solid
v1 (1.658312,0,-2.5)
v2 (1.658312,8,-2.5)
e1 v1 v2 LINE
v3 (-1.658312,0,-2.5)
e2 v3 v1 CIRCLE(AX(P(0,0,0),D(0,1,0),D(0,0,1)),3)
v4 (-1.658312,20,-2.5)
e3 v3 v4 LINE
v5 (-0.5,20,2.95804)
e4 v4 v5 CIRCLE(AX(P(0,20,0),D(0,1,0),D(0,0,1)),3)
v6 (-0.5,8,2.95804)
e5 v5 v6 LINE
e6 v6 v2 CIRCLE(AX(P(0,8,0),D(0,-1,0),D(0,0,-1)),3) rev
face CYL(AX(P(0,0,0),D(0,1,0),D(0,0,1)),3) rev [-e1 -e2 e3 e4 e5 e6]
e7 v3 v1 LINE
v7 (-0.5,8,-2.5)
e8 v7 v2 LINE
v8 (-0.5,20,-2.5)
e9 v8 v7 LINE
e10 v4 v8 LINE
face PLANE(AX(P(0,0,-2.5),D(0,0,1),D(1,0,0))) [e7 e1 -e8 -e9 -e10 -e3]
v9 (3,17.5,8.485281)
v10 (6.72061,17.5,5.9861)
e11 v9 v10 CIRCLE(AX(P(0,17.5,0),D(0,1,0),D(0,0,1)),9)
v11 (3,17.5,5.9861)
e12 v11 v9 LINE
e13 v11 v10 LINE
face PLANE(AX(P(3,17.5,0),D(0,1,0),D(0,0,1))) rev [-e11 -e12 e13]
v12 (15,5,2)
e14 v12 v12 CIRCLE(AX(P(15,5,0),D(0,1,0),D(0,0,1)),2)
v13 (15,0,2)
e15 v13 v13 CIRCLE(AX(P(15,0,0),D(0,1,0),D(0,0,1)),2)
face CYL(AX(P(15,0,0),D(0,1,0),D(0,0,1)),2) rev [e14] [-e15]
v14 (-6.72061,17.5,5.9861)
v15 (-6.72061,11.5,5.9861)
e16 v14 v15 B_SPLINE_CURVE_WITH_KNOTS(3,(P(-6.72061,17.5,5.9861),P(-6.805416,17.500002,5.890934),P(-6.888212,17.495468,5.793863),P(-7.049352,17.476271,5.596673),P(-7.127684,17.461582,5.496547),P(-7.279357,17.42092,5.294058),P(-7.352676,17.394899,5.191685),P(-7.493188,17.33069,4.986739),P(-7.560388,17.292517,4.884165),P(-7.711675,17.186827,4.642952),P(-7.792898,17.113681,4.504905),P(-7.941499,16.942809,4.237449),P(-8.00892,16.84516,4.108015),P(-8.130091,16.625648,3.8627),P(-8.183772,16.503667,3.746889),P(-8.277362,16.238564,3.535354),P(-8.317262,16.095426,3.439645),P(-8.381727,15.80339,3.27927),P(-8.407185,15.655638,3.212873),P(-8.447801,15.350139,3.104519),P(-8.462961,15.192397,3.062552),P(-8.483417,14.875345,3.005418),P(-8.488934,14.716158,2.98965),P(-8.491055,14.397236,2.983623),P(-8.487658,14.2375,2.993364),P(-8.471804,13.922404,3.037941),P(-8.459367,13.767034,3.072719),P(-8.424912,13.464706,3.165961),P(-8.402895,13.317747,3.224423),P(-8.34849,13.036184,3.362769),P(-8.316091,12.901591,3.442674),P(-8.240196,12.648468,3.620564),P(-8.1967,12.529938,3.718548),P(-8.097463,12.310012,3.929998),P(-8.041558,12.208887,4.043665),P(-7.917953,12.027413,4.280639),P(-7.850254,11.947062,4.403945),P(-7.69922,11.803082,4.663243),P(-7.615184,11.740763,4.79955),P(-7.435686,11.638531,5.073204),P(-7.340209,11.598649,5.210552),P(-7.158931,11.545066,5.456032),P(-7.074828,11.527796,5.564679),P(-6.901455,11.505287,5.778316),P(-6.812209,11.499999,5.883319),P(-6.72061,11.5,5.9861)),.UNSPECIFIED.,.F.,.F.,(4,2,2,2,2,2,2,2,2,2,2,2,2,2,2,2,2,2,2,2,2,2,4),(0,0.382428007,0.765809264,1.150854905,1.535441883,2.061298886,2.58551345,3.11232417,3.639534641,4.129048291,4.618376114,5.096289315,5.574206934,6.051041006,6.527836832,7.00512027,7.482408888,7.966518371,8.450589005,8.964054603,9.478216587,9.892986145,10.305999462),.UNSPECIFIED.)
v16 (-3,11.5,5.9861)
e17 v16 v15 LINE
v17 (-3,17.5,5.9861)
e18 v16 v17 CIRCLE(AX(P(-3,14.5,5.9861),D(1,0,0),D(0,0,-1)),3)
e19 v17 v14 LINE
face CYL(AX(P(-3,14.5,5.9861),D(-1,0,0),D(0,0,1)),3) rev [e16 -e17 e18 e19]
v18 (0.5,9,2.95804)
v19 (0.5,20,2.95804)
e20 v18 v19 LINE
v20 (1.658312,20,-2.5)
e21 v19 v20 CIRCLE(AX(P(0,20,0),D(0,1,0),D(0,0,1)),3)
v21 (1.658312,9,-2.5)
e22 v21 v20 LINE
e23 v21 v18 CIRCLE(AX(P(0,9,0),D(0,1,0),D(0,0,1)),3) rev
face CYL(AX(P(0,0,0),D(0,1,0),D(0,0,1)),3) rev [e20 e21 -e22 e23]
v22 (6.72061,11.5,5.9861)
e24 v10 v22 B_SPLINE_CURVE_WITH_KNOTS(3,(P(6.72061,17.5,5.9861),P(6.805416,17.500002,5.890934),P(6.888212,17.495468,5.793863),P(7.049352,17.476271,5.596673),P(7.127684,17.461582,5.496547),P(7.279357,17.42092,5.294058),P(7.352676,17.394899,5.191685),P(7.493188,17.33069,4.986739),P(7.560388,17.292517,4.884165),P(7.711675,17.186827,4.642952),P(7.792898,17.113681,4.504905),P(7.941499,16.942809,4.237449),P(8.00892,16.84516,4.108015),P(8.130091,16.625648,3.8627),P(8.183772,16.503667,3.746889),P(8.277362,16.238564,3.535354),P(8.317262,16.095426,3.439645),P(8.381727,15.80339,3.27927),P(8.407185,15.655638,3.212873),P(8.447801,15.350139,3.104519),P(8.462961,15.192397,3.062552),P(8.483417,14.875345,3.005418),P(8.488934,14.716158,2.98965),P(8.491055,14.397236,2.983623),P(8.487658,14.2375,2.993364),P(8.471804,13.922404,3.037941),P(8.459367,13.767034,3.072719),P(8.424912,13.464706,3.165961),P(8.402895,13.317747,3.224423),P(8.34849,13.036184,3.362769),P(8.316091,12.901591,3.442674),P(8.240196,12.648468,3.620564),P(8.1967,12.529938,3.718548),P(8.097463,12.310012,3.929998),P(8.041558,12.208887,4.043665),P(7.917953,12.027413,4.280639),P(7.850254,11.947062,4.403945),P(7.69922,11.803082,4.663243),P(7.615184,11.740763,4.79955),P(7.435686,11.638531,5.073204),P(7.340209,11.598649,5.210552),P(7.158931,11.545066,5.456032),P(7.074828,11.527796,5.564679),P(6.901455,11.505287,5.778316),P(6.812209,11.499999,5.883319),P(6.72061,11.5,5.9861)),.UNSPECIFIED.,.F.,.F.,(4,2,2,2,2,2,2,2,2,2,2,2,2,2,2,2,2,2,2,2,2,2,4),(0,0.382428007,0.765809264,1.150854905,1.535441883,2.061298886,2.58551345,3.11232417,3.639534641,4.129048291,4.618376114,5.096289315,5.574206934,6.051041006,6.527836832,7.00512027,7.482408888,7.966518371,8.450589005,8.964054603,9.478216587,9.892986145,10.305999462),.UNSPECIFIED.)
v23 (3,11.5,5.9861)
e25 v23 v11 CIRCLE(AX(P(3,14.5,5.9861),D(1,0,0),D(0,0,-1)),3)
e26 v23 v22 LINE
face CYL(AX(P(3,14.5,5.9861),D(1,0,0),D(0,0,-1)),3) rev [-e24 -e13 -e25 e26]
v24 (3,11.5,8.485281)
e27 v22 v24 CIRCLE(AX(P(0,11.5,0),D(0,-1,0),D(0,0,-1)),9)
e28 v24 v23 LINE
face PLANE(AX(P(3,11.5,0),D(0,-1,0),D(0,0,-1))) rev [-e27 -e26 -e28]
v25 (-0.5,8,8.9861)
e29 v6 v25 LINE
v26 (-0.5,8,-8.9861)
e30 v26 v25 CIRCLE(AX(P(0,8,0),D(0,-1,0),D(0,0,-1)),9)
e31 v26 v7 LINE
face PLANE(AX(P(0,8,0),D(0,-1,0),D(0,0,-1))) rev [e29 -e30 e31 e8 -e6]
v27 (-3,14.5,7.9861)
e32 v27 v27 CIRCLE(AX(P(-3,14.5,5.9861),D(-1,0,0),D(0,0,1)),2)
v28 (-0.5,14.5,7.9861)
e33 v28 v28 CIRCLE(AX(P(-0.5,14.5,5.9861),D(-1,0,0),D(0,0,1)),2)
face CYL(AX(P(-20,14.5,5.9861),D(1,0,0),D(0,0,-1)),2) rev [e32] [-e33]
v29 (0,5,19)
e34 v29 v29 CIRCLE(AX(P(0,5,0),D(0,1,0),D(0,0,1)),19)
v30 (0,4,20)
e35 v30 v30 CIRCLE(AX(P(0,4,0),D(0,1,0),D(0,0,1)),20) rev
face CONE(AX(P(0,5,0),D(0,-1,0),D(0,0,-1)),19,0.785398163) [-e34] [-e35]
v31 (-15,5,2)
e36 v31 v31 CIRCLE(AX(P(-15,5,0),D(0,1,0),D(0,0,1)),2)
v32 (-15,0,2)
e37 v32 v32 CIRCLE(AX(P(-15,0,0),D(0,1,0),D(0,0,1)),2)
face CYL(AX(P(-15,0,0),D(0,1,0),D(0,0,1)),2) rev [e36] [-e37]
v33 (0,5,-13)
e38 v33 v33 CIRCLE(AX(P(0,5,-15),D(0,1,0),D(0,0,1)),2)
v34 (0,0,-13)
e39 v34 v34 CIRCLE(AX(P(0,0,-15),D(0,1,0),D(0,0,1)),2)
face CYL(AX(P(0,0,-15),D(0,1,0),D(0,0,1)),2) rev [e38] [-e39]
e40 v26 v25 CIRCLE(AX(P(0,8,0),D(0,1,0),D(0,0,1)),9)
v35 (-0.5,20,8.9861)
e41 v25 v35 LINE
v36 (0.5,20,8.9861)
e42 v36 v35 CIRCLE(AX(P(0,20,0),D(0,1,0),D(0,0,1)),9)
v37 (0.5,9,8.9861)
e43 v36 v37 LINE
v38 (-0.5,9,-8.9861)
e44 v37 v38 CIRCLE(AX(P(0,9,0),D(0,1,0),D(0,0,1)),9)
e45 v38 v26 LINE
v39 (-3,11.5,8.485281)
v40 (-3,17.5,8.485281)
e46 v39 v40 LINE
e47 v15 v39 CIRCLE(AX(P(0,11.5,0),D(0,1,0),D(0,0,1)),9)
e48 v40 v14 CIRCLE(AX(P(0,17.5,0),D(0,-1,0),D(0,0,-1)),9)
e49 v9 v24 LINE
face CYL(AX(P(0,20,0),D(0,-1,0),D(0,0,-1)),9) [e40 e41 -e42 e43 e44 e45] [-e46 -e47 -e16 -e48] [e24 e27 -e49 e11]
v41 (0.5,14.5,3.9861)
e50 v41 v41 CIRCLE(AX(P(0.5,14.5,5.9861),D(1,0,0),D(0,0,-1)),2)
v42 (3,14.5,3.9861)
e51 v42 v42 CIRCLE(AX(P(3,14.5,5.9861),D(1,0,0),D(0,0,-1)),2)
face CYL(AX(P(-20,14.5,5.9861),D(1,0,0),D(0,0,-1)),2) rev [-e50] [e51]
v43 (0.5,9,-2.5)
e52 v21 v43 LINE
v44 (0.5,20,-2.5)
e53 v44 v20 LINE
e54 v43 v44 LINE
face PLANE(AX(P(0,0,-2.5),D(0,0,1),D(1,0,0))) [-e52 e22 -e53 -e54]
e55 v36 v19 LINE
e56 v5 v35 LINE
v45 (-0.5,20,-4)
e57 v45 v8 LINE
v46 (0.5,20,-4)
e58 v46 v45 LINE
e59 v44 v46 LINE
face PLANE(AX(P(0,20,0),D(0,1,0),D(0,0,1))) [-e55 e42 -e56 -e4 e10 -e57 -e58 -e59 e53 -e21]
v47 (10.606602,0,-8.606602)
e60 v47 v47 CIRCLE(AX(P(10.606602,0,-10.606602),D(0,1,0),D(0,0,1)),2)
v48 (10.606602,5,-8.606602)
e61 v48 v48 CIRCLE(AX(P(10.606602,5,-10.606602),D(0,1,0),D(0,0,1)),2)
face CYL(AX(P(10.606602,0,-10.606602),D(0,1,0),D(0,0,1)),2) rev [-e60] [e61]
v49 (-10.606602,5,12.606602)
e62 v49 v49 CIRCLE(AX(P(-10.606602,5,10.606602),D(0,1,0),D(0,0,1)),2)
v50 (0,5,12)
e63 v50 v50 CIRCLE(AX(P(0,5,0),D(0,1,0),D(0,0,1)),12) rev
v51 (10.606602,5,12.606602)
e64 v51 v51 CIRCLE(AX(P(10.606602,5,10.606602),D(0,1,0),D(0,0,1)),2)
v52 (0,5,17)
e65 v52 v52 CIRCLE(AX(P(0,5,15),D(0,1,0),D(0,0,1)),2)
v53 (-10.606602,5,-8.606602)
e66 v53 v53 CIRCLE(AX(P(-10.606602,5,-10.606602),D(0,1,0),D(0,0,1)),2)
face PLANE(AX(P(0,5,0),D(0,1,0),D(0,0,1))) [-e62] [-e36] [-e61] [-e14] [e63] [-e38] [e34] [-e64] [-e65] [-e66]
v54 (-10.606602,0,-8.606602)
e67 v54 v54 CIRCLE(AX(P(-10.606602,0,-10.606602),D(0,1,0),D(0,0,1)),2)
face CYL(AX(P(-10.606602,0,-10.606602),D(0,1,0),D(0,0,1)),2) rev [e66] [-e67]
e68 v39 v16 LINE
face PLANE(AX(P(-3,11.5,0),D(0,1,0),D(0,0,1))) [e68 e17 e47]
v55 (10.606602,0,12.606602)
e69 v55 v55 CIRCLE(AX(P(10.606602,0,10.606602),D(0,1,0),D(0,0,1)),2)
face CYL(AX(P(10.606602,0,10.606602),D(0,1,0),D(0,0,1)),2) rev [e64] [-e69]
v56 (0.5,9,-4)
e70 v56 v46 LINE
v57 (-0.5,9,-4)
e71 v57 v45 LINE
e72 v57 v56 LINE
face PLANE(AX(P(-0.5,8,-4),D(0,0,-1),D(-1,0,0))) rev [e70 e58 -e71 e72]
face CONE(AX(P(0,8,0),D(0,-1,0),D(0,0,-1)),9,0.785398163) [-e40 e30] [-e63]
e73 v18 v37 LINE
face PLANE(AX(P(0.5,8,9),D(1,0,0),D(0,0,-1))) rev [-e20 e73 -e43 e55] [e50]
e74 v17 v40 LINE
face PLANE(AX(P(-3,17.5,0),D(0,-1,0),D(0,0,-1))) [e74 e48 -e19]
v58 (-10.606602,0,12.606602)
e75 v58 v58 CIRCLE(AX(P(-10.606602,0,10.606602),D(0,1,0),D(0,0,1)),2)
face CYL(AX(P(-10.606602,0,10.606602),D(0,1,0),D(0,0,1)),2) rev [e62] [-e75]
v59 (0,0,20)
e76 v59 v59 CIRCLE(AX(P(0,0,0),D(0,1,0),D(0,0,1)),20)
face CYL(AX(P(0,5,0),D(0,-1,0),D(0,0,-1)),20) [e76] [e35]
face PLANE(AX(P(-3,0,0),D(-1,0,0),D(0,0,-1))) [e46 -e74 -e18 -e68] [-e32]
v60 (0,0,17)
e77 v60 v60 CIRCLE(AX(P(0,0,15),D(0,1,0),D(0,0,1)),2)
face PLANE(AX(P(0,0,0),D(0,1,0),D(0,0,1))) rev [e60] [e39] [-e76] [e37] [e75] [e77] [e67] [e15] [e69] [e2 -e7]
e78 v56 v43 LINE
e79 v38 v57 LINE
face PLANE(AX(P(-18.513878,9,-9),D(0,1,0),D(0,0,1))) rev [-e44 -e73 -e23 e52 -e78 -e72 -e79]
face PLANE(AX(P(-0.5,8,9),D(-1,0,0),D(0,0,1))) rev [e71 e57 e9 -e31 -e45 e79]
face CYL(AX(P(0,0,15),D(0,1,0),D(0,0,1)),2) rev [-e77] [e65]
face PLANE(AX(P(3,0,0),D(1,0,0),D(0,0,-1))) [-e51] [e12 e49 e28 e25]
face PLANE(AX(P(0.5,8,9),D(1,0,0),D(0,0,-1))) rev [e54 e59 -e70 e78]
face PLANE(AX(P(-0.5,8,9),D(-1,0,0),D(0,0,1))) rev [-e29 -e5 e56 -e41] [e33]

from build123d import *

# Parameters (mm, degrees)
SKETCH1_R           = 20
BOSS_EXTRUDE1_DEPTH = 5
SKETCH2_R           = 2
CUT_EXTRUDE1_DEPTH  = 29.722813233
SKETCH3_R           = 9
BOSS_EXTRUDE2_DEPTH = 15
CUT_EXTRUDE2_DEPTH  = 35.641016151
SKETCH5_W           = 1
SKETCH5_H           = 13
CUT_EXTRUDE3_DEPTH  = 12
CUT_EXTRUDE4_REACH  = 42.509
SKETCH7_W           = 17.986100378
SKETCH7_H           = 1
SKETCH8_R           = 3
CUT_EXTRUDE5_DEPTH  = 6
SKETCH9_R           = 2
CUT_EXTRUDE6_DEPTH  = 37.455452322
CHAMFER3_SIZE       = 3
CHAMFER4_SIZE       = 1


with BuildPart() as part:
    # Sketch1 → Boss-Extrude1 (new body)
    with BuildSketch(Plane(origin=(0, 0, 0), x_dir=(1, 0, 0), z_dir=(0, 1, 0))):
        with Locations(Location((0, 0, 0), (0, 0, 270))):
            Circle(SKETCH1_R)
    extrude(amount=BOSS_EXTRUDE1_DEPTH)

    # Sketch2 → Cut-Extrude1 (cut, through all)
    with BuildSketch(Plane(origin=(0, 5, 0), x_dir=(1, 0, 0), z_dir=(0, 1, 0))):
        with Locations(Location((0, 15, 0), (0, 0, 270))):
            Circle(SKETCH2_R)
        with Locations(Location((10.606601718, 10.606601718, 0), (0, 0, 270))):
            Circle(SKETCH2_R)
        with Locations(Location((15, 0, 0), (0, 0, 270))):
            Circle(SKETCH2_R)
        with Locations(Location((10.606601718, -10.606601718, 0), (0, 0, 270))):
            Circle(SKETCH2_R)
        with Locations(Location((0, -15, 0), (0, 0, 270))):
            Circle(SKETCH2_R)
        with Locations(Location((-10.606601718, -10.606601718, 0), (0, 0, 270))):
            Circle(SKETCH2_R)
        with Locations(Location((-15, 0, 0), (0, 0, 270))):
            Circle(SKETCH2_R)
        with Locations(Location((-10.606601718, 10.606601718, 0), (0, 0, 270))):
            Circle(SKETCH2_R)
    extrude(amount=-CUT_EXTRUDE1_DEPTH, mode=Mode.SUBTRACT)

    # Sketch3 → Boss-Extrude2 (add)
    with BuildSketch(Plane(origin=(0, 5, 0), x_dir=(1, 0, 0), z_dir=(0, 1, 0))):
        with Locations(Location((0, 0, 0), (0, 0, 270))):
            Circle(SKETCH3_R)
    extrude(amount=BOSS_EXTRUDE2_DEPTH)

    # Sketch4 → Cut-Extrude2 (cut, through all)
    with BuildSketch(Plane(origin=(0, 20, 0), x_dir=(1, 0, 0), z_dir=(0, 1, 0))):
        with BuildLine():
            Line((1.658312395, 2.5), (-1.658312395, 2.5))
            ThreePointArc((-1.658312395, 2.5), (-1.418637165, -2.643382037), (3, 0))
            ThreePointArc((3, 0), (2.643382037, 1.418637165), (1.658312395, 2.5))
        make_face()
    extrude(amount=-CUT_EXTRUDE2_DEPTH, mode=Mode.SUBTRACT)

    # Sketch5 → Cut-Extrude3 (cut)
    with BuildSketch(Plane(origin=(0, 20, 0), x_dir=(1, 0, 0), z_dir=(0, 1, 0))):
        with Locations((0, -2.5)):
            Rectangle(SKETCH5_W, SKETCH5_H)
    extrude(amount=-CUT_EXTRUDE3_DEPTH, mode=Mode.SUBTRACT)

    # Cut-Extrude4: up to this face of the body (flat: up to its plane)
    cut_extrude4_end = Plane(part.part.faces().sort_by_distance((-0.5, 14, 5.972070135))[0])
    # Sketch7 → Cut-Extrude4 (cut, up to the picked face)
    with BuildSketch(Plane(origin=(9, 0, 0), x_dir=(0, 0, -1), z_dir=(1, 0, 0)), mode=Mode.PRIVATE) as cut_extrude4_sk1:
        with Locations((0.006949811, 8.5)):
            Rectangle(SKETCH7_W, SKETCH7_H)
    cut_extrude4_tool1 = split(extrude(cut_extrude4_sk1.sketch, amount=-CUT_EXTRUDE4_REACH, mode=Mode.PRIVATE), bisect_by=cut_extrude4_end, keep=Keep.BOTH, mode=Mode.PRIVATE)
    add(cut_extrude4_tool1.solids().sort_by(Axis((9, 8.5, -0.00695), (-1, 0, 0)))[0], mode=Mode.SUBTRACT)

    # Sketch8 → Cut-Extrude5 (cut)
    with BuildSketch(Plane(origin=(9, 0, 0), x_dir=(0, 0, -1), z_dir=(1, 0, 0))):
        with Locations((-5.986100378, 14.5)):
            Circle(SKETCH8_R)
        with BuildLine():
            ThreePointArc((-8.986100378, 14.5), (-8.107420721, 16.621320344), (-5.986100378, 17.5))
            Line((-5.986100378, 17.5), (-8.986100378, 17.5))
            Line((-8.986100378, 17.5), (-8.986100378, 14.5))
        make_face()
        with BuildLine():
            ThreePointArc((-5.986100378, 11.5), (-8.107420721, 12.378679656), (-8.986100378, 14.5))
            Line((-8.986100378, 14.5), (-8.986100378, 11.5))
            Line((-8.986100378, 11.5), (-5.986100378, 11.5))
        make_face()
    cut_extrude5 = extrude(amount=-CUT_EXTRUDE5_DEPTH, mode=Mode.SUBTRACT)

    # Mirror1: Cut-Extrude5 across plane
    add(cut_extrude5.mirror(Plane(origin=(0, 0, 0), x_dir=(0, 0, 1), z_dir=(1, 0, 0))), mode=Mode.SUBTRACT)

    # Sketch9 → Cut-Extrude6 (cut, through all)
    with BuildSketch(Plane(origin=(3, 0, 0), x_dir=(0, 0, -1), z_dir=(1, 0, 0))):
        with Locations(Location((-5.986100378, 14.5, 0), (0, 0, 180))):
            Circle(SKETCH9_R)
    extrude(amount=-CUT_EXTRUDE6_DEPTH, mode=Mode.SUBTRACT)

    # Chamfer3
    chamfer3_edges = [part.edges().sort_by_distance(p)[0] for p in [
        (0, 5, -9),
    ]]
    chamfer(chamfer3_edges, length=CHAMFER3_SIZE - 0.0001)  # a hair under: the kernel refuses the full size

    # Chamfer4
    chamfer4_edges = [part.edges().sort_by_distance(p)[0] for p in [
        (0, 5, -20),
    ]]
    chamfer(chamfer4_edges, length=CHAMFER4_SIZE)


solid = part.part
